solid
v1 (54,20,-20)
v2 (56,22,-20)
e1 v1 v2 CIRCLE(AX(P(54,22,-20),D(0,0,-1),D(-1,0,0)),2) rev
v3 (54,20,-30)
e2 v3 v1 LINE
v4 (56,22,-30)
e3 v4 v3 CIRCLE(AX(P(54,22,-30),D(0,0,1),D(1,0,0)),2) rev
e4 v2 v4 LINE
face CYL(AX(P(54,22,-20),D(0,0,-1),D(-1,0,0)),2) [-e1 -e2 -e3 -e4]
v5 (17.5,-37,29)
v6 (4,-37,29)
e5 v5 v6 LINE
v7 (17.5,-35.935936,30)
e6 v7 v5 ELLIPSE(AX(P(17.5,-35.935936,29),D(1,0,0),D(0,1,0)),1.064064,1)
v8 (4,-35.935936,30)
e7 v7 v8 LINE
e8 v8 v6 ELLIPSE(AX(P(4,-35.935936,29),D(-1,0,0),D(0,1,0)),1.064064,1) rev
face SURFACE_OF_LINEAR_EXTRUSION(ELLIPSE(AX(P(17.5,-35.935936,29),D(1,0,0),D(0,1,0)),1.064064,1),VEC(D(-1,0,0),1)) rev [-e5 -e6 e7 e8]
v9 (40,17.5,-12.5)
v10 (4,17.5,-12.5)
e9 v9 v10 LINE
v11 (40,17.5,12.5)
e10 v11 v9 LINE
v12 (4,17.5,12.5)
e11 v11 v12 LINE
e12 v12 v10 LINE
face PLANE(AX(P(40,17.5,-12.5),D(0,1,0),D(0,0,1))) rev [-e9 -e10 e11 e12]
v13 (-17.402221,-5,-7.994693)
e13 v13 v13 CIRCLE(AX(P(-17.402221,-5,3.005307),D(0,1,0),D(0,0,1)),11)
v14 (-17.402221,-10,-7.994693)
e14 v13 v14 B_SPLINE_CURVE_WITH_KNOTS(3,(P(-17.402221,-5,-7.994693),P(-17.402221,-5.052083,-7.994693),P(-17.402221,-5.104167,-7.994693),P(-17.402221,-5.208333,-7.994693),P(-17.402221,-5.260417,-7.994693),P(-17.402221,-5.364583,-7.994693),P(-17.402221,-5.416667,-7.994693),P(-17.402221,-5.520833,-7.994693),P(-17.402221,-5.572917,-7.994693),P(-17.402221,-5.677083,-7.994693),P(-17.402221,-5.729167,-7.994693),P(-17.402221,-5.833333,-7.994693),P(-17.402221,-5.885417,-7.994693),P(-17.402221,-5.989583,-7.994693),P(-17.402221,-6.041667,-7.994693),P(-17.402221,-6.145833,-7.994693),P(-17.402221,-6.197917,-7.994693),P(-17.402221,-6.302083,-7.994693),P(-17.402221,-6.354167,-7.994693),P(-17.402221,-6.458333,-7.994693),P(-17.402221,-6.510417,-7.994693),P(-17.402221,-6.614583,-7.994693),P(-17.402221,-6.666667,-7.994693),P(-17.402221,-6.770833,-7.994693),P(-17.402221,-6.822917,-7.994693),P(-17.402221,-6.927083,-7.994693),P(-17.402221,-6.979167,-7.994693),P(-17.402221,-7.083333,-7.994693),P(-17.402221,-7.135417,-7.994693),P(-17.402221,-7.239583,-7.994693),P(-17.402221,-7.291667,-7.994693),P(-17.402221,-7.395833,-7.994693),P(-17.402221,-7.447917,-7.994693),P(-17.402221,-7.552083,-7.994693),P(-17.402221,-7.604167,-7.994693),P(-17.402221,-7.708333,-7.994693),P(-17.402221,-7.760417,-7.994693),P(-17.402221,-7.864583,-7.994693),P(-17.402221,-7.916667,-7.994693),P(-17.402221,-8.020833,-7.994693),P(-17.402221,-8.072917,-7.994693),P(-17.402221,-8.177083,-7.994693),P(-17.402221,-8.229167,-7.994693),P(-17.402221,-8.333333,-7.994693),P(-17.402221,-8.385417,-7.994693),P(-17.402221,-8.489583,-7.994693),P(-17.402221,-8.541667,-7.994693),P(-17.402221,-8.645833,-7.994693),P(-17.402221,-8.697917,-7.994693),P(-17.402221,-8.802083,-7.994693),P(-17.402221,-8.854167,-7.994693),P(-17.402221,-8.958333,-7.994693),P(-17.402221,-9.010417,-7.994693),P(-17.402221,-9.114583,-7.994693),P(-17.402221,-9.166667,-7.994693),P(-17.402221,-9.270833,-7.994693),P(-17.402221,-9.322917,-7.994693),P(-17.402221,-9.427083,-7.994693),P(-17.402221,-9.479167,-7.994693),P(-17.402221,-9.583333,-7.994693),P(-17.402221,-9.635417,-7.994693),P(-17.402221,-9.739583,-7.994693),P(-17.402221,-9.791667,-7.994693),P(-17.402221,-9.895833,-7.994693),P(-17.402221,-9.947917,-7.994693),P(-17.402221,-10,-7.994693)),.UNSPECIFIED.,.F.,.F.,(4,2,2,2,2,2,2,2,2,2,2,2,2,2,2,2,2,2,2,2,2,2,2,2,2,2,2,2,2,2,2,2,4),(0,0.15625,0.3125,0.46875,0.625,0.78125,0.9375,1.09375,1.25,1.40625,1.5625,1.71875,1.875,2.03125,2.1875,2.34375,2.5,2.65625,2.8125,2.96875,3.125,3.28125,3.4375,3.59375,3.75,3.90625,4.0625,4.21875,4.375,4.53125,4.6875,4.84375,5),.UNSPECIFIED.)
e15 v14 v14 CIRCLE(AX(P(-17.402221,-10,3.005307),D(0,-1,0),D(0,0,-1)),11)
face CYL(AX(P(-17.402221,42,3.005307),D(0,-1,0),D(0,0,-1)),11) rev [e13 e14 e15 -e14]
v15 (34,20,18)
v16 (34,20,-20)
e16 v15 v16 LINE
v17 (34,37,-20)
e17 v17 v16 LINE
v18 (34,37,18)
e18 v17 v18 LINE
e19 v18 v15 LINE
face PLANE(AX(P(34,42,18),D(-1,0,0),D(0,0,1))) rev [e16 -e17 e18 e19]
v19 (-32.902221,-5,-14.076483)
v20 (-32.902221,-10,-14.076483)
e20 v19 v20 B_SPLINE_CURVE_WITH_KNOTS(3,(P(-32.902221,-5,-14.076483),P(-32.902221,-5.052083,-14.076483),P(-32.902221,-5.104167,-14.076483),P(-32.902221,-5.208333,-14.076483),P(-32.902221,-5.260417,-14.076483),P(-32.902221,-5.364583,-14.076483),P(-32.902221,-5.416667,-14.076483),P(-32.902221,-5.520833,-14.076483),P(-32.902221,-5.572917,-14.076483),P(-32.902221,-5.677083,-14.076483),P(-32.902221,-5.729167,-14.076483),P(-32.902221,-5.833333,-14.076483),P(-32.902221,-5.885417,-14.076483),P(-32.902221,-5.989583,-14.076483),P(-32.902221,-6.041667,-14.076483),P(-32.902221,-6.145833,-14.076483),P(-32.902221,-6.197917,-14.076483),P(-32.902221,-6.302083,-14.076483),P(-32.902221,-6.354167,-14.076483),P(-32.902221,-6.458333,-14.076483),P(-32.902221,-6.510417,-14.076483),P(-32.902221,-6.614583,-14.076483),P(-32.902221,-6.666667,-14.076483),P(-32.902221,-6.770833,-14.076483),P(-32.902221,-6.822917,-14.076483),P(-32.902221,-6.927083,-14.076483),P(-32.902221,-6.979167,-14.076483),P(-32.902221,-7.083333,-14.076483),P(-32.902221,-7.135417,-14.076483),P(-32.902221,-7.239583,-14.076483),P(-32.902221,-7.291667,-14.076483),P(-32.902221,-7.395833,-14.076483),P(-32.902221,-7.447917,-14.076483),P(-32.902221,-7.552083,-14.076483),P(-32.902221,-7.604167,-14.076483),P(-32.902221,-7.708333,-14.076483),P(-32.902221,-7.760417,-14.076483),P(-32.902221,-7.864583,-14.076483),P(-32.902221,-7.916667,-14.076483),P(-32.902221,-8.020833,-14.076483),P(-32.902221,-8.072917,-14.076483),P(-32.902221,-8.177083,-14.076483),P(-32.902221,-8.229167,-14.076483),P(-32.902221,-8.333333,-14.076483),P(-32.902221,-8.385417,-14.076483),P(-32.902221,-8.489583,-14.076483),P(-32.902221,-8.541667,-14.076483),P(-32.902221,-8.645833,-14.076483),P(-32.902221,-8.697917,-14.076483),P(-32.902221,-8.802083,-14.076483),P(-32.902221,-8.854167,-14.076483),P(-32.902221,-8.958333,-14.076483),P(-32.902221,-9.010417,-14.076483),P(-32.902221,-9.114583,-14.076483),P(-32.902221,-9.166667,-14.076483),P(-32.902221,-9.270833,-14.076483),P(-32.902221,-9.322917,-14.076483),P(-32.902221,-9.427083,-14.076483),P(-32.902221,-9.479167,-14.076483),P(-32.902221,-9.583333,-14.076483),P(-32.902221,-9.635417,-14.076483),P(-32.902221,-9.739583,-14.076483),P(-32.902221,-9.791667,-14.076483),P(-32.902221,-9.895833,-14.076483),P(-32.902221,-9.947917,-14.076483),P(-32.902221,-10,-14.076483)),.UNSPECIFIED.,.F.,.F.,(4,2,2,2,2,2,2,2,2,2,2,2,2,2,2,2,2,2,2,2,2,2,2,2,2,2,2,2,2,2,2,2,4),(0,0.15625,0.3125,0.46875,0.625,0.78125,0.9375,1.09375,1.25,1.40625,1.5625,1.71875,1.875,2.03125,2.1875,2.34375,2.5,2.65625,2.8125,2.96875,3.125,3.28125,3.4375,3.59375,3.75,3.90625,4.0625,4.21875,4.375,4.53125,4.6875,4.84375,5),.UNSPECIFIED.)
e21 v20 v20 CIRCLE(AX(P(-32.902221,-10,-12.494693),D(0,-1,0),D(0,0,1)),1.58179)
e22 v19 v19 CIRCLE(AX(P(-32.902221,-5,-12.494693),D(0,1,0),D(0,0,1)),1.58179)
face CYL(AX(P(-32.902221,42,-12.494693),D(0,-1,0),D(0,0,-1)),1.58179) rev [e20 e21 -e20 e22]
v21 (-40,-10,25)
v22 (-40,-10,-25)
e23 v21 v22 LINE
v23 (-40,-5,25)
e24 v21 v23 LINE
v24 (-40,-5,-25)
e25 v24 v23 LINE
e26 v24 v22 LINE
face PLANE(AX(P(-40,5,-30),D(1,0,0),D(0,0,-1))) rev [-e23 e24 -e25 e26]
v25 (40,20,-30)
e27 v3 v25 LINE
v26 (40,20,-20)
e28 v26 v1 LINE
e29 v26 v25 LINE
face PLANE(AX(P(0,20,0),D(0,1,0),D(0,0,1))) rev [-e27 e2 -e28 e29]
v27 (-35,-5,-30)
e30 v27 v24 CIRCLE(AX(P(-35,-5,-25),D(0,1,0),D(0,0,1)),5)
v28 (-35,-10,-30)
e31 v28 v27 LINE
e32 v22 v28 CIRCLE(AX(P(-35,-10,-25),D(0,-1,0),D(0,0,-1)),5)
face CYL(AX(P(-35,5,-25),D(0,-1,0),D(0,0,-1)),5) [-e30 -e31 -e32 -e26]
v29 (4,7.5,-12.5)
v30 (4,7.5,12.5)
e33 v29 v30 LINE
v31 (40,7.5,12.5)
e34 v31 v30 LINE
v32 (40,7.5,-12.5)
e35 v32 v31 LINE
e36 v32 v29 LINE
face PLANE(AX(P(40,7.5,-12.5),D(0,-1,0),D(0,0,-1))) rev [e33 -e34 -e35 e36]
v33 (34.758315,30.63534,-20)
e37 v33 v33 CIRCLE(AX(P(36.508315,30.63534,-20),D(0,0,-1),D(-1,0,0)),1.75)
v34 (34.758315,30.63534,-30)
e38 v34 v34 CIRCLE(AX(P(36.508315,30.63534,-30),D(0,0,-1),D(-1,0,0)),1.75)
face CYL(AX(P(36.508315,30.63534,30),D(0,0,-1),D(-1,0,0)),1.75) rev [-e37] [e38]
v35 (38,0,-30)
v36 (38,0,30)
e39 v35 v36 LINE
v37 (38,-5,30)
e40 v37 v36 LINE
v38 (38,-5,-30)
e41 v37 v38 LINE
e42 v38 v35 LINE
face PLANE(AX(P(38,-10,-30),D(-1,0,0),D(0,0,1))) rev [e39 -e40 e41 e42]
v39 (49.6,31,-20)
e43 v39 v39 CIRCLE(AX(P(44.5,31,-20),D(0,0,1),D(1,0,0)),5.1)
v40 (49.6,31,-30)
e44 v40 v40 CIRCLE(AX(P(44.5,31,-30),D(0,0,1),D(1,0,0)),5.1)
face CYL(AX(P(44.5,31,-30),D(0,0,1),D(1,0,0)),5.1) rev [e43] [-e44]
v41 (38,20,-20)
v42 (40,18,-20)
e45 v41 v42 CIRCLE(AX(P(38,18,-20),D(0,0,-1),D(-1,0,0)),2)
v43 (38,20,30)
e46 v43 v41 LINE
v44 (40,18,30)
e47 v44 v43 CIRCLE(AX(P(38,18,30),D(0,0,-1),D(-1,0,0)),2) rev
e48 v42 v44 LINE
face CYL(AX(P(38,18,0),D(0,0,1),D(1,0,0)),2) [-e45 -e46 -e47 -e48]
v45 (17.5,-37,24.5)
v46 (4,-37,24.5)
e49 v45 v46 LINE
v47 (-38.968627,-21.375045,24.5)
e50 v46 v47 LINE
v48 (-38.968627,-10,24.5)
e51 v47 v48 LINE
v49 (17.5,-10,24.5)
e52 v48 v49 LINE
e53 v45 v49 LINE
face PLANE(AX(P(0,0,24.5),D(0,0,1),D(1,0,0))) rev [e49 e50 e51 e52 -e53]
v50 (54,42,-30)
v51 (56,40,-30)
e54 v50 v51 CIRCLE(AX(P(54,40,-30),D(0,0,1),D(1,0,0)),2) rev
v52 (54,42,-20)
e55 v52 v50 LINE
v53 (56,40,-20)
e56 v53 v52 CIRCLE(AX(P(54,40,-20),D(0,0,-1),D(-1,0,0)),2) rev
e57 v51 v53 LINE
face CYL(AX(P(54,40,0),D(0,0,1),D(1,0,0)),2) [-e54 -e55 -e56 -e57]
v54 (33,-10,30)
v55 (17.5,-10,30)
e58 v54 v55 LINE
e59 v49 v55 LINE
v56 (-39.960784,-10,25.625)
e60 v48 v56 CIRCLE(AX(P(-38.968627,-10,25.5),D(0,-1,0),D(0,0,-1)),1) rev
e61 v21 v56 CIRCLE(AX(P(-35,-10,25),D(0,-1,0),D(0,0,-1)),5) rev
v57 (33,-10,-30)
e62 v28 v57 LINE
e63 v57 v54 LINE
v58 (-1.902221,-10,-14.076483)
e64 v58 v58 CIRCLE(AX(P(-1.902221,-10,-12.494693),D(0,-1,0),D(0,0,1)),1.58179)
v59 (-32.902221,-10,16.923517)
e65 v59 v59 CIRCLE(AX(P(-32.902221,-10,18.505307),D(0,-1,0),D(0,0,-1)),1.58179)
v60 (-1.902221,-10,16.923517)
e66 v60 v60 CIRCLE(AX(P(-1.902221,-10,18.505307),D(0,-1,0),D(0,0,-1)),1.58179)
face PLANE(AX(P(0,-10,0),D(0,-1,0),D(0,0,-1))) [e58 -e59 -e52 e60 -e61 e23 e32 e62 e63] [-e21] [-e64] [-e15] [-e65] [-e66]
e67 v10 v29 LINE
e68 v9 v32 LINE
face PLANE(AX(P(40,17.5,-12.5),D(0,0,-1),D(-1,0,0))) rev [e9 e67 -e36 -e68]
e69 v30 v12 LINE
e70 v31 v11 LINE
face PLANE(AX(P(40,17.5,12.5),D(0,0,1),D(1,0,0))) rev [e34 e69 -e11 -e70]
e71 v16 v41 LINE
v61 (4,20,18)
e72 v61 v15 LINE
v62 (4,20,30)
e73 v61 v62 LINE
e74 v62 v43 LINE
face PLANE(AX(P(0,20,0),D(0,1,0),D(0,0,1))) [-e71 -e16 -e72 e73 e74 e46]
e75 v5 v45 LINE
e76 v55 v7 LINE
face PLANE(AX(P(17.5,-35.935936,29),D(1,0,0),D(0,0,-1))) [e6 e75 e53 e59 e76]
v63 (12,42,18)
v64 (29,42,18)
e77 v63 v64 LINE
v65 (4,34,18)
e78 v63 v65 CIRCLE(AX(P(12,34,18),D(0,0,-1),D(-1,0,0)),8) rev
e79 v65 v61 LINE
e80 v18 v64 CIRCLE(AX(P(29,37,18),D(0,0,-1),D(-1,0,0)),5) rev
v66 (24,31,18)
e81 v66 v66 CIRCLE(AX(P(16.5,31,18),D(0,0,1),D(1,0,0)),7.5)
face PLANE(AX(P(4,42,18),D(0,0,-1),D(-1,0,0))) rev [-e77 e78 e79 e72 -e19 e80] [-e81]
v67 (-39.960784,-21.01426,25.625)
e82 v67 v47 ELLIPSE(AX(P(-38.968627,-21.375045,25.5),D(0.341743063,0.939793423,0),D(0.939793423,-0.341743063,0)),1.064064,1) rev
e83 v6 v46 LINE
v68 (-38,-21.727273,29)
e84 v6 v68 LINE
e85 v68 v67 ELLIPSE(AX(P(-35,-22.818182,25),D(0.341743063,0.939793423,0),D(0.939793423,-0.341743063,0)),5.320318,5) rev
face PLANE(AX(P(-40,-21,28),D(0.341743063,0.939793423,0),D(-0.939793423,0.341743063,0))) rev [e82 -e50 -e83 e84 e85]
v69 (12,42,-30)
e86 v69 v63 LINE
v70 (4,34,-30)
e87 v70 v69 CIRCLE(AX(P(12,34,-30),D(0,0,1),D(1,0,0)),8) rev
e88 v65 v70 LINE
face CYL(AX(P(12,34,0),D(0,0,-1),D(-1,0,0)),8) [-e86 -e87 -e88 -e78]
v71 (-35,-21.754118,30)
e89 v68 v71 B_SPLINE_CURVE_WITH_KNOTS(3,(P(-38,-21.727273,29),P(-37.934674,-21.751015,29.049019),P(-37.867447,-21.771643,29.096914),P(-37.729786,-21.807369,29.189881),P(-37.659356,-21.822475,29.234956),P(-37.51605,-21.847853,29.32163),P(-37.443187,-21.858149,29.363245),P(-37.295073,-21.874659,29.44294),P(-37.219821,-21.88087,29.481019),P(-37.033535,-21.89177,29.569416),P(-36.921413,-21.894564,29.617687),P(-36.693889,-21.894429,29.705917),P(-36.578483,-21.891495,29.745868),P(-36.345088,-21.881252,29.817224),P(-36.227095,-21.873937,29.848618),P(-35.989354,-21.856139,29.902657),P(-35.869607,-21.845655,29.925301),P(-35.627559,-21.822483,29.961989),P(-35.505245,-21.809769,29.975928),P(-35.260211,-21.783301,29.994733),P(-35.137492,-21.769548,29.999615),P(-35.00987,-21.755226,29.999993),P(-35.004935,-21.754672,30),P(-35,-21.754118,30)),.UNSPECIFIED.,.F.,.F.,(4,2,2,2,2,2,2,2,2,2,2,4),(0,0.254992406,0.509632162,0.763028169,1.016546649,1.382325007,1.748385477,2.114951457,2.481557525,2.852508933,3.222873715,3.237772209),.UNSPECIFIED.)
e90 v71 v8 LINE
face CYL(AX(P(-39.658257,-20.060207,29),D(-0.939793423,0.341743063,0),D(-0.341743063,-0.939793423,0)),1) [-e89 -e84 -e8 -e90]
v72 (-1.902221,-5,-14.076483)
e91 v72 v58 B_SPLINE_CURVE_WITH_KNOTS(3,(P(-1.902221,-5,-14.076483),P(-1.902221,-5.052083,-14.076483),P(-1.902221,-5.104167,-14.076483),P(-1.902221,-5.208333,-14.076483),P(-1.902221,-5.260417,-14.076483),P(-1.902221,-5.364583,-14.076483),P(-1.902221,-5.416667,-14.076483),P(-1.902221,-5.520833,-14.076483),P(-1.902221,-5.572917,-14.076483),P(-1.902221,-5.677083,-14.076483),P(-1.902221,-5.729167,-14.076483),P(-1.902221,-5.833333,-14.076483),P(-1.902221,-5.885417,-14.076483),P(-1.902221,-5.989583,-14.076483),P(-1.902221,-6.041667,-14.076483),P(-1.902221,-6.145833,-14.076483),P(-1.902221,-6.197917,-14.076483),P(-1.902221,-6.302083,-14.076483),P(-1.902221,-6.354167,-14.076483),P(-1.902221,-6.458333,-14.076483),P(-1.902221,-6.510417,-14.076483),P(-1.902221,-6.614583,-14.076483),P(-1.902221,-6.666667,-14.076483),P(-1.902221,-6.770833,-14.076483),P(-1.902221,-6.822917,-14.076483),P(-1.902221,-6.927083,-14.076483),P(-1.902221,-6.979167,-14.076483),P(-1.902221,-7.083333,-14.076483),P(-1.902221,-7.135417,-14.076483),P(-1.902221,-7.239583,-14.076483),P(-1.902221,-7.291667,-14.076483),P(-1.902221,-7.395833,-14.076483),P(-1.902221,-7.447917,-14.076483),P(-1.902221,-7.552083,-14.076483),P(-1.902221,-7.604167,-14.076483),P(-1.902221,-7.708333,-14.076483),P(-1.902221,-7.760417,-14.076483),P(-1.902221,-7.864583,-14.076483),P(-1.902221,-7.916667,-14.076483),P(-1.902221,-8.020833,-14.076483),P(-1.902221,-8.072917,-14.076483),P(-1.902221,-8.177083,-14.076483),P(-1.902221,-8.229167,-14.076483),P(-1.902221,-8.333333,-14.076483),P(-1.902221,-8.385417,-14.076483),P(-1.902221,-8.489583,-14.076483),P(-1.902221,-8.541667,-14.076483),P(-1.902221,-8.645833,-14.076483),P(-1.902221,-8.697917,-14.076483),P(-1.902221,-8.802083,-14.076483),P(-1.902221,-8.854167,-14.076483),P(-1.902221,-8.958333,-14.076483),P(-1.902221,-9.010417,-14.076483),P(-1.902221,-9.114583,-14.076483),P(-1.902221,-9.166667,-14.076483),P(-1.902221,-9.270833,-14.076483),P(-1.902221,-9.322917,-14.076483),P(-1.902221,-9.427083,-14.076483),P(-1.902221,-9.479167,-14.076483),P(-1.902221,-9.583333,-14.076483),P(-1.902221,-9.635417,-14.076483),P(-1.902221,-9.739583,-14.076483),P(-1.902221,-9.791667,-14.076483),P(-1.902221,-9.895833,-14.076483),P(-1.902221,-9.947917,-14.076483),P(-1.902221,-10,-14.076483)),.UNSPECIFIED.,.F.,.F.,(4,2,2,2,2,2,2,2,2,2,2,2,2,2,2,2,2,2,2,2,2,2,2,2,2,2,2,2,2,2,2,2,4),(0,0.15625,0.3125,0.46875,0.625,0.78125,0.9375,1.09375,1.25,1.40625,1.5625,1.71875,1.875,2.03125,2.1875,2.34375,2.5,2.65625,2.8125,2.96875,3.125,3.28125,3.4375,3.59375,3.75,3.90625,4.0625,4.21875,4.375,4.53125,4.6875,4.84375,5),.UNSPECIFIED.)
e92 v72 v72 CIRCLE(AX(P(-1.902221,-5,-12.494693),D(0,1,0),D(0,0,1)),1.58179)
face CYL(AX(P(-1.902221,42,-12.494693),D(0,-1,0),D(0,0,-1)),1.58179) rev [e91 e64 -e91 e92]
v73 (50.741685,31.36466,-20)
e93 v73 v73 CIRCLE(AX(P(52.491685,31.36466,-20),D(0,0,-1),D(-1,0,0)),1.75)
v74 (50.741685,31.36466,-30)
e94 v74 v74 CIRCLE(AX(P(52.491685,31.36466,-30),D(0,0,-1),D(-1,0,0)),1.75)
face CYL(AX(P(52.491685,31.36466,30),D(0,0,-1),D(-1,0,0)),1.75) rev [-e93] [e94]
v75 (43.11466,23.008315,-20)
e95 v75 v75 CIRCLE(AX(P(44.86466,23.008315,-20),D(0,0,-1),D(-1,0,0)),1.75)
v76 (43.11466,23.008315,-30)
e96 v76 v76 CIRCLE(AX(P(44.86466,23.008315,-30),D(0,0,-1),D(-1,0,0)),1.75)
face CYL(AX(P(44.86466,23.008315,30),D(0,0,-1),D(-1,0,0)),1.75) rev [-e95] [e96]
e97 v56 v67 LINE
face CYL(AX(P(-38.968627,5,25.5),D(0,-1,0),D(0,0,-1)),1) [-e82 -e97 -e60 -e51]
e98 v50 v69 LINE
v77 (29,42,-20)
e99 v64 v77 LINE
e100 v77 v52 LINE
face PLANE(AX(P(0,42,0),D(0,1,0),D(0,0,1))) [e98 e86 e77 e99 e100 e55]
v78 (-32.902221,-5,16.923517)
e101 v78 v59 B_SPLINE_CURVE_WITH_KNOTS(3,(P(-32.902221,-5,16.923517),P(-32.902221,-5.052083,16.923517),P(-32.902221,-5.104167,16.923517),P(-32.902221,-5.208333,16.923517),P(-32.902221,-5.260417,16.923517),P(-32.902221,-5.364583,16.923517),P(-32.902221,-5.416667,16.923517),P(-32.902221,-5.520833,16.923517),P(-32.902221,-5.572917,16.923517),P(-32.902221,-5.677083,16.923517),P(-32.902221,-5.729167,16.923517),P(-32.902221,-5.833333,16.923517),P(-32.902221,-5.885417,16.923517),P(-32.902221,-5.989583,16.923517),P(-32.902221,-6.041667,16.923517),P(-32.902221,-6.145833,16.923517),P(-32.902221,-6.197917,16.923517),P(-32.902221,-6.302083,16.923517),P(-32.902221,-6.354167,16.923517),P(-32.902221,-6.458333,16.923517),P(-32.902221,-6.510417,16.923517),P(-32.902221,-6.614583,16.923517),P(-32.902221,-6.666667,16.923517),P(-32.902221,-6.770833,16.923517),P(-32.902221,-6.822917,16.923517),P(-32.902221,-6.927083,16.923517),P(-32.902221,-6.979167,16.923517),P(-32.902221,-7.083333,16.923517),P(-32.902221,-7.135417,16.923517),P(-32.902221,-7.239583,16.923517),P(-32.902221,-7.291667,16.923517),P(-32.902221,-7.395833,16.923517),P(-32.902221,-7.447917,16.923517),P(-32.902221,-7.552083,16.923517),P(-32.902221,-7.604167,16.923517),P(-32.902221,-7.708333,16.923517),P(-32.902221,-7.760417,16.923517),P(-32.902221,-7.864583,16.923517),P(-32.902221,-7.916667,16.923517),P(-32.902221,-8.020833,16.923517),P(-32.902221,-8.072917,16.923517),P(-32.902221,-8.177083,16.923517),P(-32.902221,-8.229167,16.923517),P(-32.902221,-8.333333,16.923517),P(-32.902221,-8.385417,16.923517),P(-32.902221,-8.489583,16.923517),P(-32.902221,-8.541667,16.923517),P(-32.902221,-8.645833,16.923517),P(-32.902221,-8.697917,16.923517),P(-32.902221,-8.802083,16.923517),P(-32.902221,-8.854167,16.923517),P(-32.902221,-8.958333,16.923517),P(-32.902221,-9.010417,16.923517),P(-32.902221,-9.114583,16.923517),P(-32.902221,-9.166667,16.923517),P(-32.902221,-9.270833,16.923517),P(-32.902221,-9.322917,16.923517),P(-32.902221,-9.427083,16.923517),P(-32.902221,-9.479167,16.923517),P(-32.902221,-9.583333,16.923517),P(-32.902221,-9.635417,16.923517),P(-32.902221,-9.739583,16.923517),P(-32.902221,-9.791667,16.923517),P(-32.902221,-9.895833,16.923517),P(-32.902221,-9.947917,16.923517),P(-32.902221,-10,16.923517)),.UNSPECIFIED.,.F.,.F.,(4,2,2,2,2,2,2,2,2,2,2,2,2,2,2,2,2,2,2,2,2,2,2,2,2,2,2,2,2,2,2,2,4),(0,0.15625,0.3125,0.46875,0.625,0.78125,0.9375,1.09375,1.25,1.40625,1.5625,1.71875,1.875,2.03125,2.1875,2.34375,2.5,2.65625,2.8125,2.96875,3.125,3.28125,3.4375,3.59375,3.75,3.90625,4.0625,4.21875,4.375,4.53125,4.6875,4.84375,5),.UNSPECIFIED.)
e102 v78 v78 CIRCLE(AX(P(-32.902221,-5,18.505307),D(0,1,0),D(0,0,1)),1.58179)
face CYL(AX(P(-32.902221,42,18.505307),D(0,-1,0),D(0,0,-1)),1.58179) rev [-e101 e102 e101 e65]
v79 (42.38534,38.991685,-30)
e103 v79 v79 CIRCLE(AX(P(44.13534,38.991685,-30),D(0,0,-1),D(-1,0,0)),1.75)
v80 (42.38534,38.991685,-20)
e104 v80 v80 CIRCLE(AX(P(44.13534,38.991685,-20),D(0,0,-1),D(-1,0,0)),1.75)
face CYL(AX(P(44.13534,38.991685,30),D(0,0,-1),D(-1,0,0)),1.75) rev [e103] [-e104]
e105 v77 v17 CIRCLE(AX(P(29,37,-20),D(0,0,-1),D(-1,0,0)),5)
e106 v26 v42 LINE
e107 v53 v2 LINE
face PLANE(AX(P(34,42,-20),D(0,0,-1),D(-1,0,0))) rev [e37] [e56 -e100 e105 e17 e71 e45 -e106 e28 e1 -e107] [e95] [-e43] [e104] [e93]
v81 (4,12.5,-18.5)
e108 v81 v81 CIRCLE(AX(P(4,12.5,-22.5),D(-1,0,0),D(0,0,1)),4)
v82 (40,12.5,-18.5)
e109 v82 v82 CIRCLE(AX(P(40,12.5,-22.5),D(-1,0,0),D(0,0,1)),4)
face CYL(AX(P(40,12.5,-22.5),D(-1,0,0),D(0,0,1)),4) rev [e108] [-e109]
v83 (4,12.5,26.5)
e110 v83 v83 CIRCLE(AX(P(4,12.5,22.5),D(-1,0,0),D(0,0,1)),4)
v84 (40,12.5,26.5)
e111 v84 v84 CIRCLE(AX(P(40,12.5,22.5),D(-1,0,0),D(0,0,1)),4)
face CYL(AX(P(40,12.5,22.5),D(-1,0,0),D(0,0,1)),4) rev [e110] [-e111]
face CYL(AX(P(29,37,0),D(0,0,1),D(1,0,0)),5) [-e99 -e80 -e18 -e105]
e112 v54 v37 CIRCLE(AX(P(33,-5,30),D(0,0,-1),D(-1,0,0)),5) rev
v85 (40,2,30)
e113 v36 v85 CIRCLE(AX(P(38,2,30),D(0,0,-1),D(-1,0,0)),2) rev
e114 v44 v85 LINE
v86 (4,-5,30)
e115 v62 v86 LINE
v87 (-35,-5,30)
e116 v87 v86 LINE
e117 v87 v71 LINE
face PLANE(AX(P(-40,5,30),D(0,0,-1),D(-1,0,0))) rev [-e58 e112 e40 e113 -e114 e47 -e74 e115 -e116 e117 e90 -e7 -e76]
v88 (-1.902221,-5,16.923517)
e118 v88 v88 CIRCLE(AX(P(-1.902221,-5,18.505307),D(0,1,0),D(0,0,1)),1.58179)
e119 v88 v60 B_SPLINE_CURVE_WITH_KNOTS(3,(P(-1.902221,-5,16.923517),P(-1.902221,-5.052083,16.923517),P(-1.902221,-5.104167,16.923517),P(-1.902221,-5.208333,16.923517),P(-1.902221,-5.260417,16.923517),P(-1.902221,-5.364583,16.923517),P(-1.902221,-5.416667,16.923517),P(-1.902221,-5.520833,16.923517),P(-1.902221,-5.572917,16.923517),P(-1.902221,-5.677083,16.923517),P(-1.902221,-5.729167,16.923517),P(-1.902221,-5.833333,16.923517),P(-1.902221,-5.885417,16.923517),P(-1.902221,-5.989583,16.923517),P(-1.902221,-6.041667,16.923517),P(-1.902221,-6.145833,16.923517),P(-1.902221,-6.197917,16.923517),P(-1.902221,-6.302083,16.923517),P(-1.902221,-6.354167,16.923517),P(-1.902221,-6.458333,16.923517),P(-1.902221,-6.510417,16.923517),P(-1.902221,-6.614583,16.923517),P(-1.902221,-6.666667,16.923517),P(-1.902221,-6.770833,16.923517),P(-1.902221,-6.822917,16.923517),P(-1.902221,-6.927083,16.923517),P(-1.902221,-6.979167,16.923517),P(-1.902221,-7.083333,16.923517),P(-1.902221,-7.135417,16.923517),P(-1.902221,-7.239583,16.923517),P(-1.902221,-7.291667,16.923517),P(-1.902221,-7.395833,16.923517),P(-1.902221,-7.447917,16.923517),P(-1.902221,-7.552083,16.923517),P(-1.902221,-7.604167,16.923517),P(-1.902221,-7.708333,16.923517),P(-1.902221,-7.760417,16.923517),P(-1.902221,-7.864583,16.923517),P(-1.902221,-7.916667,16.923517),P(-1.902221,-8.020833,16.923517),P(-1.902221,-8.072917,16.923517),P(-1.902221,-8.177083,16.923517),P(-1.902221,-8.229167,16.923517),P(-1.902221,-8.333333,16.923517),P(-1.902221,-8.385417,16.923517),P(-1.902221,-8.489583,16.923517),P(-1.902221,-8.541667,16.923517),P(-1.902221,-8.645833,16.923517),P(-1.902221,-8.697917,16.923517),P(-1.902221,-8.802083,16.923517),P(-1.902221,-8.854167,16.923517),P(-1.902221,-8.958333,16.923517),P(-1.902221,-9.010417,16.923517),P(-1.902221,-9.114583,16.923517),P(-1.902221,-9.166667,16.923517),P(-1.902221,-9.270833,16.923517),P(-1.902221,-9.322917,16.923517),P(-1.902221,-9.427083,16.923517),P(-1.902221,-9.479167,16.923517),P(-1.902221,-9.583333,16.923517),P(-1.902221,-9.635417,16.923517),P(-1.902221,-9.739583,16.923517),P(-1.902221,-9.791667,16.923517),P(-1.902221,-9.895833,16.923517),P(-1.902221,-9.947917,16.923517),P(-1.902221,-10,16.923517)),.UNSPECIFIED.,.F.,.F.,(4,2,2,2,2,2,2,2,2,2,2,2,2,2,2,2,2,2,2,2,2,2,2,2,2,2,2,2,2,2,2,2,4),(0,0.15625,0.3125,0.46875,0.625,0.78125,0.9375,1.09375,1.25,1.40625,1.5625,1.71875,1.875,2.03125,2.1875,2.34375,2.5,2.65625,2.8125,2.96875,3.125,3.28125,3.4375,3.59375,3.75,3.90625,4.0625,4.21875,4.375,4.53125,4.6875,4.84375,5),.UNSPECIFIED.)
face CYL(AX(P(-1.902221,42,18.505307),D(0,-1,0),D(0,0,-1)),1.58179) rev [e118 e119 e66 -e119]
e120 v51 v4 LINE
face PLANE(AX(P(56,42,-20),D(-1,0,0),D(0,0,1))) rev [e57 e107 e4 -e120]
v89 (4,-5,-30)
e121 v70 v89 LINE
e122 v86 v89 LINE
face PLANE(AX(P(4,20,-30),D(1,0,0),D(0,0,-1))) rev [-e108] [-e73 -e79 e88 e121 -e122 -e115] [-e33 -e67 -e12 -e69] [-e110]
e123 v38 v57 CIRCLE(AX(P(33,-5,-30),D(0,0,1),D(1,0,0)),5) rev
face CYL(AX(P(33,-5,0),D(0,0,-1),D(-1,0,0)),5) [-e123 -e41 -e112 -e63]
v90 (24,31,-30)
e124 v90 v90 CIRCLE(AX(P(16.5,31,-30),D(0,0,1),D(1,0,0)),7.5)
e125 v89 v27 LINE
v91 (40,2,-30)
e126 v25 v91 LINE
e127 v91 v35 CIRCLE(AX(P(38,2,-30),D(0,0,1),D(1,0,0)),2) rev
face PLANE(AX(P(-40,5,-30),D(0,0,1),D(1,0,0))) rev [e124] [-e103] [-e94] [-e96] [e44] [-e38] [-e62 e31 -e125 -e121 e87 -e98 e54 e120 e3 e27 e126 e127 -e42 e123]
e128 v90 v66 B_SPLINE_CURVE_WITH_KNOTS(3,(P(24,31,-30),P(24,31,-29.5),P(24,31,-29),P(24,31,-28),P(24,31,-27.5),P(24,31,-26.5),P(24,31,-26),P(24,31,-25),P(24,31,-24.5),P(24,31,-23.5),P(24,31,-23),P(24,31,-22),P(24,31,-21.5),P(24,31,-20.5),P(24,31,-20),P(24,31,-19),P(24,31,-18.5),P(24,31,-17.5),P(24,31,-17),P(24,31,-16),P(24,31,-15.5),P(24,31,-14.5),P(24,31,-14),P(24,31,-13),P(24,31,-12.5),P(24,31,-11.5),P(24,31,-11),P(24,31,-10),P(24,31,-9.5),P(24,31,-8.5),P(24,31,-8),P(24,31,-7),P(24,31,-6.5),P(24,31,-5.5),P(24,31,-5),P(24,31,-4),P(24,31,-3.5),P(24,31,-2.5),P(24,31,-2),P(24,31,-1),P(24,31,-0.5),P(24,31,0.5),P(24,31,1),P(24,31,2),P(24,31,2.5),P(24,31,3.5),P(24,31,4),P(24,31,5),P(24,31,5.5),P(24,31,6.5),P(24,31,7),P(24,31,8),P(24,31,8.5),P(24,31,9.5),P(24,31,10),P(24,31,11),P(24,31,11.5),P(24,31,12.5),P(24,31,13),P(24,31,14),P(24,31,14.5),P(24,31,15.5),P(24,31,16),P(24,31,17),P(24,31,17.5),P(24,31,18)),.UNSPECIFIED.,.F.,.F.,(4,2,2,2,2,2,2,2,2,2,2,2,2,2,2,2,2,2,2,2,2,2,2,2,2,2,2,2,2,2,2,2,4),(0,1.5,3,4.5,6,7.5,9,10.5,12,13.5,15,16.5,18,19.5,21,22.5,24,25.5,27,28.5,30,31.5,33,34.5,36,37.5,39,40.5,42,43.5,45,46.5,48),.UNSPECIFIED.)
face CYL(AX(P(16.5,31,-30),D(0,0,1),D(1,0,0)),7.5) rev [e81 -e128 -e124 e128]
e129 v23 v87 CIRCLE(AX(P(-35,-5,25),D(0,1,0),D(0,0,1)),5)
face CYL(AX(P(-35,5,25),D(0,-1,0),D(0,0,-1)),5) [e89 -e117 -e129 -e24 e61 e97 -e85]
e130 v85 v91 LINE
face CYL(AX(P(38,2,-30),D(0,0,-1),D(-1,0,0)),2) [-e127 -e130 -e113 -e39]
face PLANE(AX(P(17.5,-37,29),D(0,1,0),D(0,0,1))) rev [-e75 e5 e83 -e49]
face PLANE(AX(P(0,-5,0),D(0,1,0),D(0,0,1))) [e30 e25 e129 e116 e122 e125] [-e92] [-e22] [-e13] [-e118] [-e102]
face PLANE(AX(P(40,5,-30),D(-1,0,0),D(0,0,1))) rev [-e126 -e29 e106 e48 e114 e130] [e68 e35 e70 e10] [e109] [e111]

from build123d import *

# Parameters (mm, degrees)
SKETCH_1_W           = 80
SKETCH_1_H           = 60
EXTRUDE_1_DEPTH      = 5
SKETCH_2_R           = 1.75
SKETCH_2_R_2         = 11
CUT_EXTRUDE_1_DEPTH  = 51.249378106
SKETCH_3_W           = 36
SKETCH_3_H           = 60
EXTRUDE_2_DEPTH      = 15
SKETCH_4_R           = 4
SKETCH_4_W           = 25
SKETCH_4_H           = 10
CUT_EXTRUDE_7_DEPTH  = 57.885850613
EXTRUDE_6_DEPTH      = 22
SKETCH_15_R          = 7.5
CUT_EXTRUDE_8_DEPTH  = 85.876380696
SKETCH_16_R          = 5.1
CUT_EXTRUDE_9_DEPTH  = 87.02325267
FILLET_1_R           = 8
FILLET_2_R           = 5
FILLET_3_R           = 2
FILLET_4_R           = 2
SKETCH_20_R          = 1.75
CUT_EXTRUDE_11_DEPTH = 93.195444573
SKETCH_23_W          = 78
SKETCH_23_H          = 60
EXTRUDE_8_DEPTH      = 10
SKETCH_26_W          = 44
SKETCH_26_H          = 60
CUT_EXTRUDE_13_DEPTH = 10
EXTRUDE_9_DEPTH      = 5
FILLET_5_R           = 5
SKETCH_25_R          = 1.581789818
SKETCH_25_R_2        = 11
CUT_EXTRUDE_14_DEPTH = 83.097503007
CUT_EXTRUDE_15_DEPTH = 1.5
EXTRUDE_10_DEPTH     = 2
FILLET_6_R           = 1
CUT_EXTRUDE_16_DEPTH = 83.097503007
EXTRUDE_11_DEPTH     = 13.5


with BuildPart() as part:
    # 草图1 → 凸台-拉伸1 (new body)
    with BuildSketch(Plane(origin=(0, 0, 0), x_dir=(1, 0, 0), z_dir=(0, 1, 0))):
        Rectangle(SKETCH_1_W, SKETCH_1_H)
    extrude(amount=EXTRUDE_1_DEPTH)

    # 草图2 → 切除-拉伸1 (cut, through all)
    with BuildSketch(Plane(origin=(0, 5, 0), x_dir=(1, 0, 0), z_dir=(0, 1, 0))):
        with Locations(Location((-3, 15.5, 0), (0, 0, 270))):
            Circle(SKETCH_2_R)
        with Locations(Location((-3, -15.5, 0), (0, 0, 270))):
            Circle(SKETCH_2_R)
        with Locations(Location((-34, -15.5, 0), (0, 0, 270))):
            Circle(SKETCH_2_R)
        with Locations(Location((-34, 15.5, 0), (0, 0, 270))):
            Circle(SKETCH_2_R)
        with Locations(Location((-18.5, 0, 0), (0, 0, 270))):
            Circle(SKETCH_2_R_2)
    extrude(amount=-CUT_EXTRUDE_1_DEPTH, mode=Mode.SUBTRACT)

    # 草图3 → 凸台-拉伸2 (add)
    with BuildSketch(Plane(origin=(0, 5, 0), x_dir=(1, 0, 0), z_dir=(0, 1, 0))):
        with Locations((22, 0)):
            Rectangle(SKETCH_3_W, SKETCH_3_H)
    extrude(amount=EXTRUDE_2_DEPTH)

    # 草图4 → 切除-拉伸7 (cut, through all)
    with BuildSketch(Plane.ZY.offset(-4)):
        with Locations((-22.5, 12.5)):
            Circle(SKETCH_4_R)
        with Locations((22.5, 12.5)):
            Circle(SKETCH_4_R)
        with Locations((0, 12.5)):
            Rectangle(SKETCH_4_W, SKETCH_4_H)
    extrude(amount=-CUT_EXTRUDE_7_DEPTH, mode=Mode.SUBTRACT)

    # 草图14 → 凸台-拉伸6 (add)
    with BuildSketch(Plane(origin=(0, 20, 0), x_dir=(1, 0, 0), z_dir=(0, 1, 0))):
        Polygon((4, 30), (4, -18), (34, -18), (34, 20), (56, 20), (56, 30), align=None)
    extrude(amount=EXTRUDE_6_DEPTH)

    # 草图15 → 切除-拉伸8 (cut, through all)
    with BuildSketch(Plane.XY.offset(18)):
        with Locations((16.5, 31)):
            Circle(SKETCH_15_R)
    extrude(amount=-CUT_EXTRUDE_8_DEPTH, mode=Mode.SUBTRACT)

    # 草图16 → 切除-拉伸9 (cut, through all)
    with BuildSketch(Plane.XY.offset(-20)):
        with Locations((44.5, 31)):
            Circle(SKETCH_16_R)
    extrude(amount=-CUT_EXTRUDE_9_DEPTH, mode=Mode.SUBTRACT)

    # 圆角1
    fillet_1_edges = [part.edges().sort_by_distance(p)[0] for p in [
        (4, 42, -6),
    ]]
    fillet(fillet_1_edges, radius=FILLET_1_R)

    # 圆角2
    fillet_2_edges = [part.edges().sort_by_distance(p)[0] for p in [
        (34, 42, -1),
    ]]
    fillet(fillet_2_edges, radius=FILLET_2_R)

    # 圆角3
    fillet_3_edges = [part.edges().sort_by_distance(p)[0] for p in [
        (56, 42, -25),
    ]]
    fillet(fillet_3_edges, radius=FILLET_3_R)

    # 圆角4
    fillet_4_edges = [part.edges().sort_by_distance(p)[0] for p in [
        (40, 20, 5),
        (40, 0, 0),
        (56, 20, -25),
    ]]
    fillet(fillet_4_edges, radius=FILLET_4_R)

    # 草图20 → 切除-拉伸11 (cut, through all)
    with BuildSketch(Plane(origin=(0, 0, -30), x_dir=(-1, 0, 0), z_dir=(0, 0, -1))):
        with Locations((-44.135340411, 38.99168464)):
            Circle(SKETCH_20_R)
        with Locations((-36.50831536, 30.635340412)):
            Circle(SKETCH_20_R)
        with Locations((-44.864659589, 23.00831536)):
            Circle(SKETCH_20_R)
        with Locations((-52.49168464, 31.364659589)):
            Circle(SKETCH_20_R)
    extrude(amount=-CUT_EXTRUDE_11_DEPTH, mode=Mode.SUBTRACT)

    # 草图23 → 凸台-拉伸8 (add)
    with BuildSketch(Plane.XZ):
        with Locations((-1, 0)):
            Rectangle(SKETCH_23_W, SKETCH_23_H)
    extrude(amount=EXTRUDE_8_DEPTH)

    # 草图26 → 切除-拉伸13 (cut)
    with BuildSketch(Plane(origin=(0, 5, 0), x_dir=(1, 0, 0), z_dir=(0, 1, 0))):
        with Locations((-18, 0)):
            Rectangle(SKETCH_26_W, SKETCH_26_H)
    extrude(amount=-CUT_EXTRUDE_13_DEPTH, mode=Mode.SUBTRACT)

    # 草图29 → 凸台-拉伸9 (add)
    with BuildSketch(Plane.XY.offset(23)):
        Polygon((-40, -5), (-40, -21), (4, -37), (4, -5), align=None)
    extrude(amount=EXTRUDE_9_DEPTH)

    # 圆角5
    fillet_5_edges = [part.edges().sort_by_distance(p)[0] for p in [
        (38, -10, 0),
        (-40, -7.5, 30),
        (-40, -7.5, -30),
    ]]
    fillet(fillet_5_edges, radius=FILLET_5_R)

    # 草图25 → 切除-拉伸14 (cut, through all)
    with BuildSketch(Plane.XZ.offset(10)):
        with Locations(Location((-32.902220535, -12.494692857, 0), (0, 0, 270))):
            Circle(SKETCH_25_R)
        with Locations(Location((-1.902220535, 18.505307143, 0), (0, 0, 270))):
            Circle(SKETCH_25_R)
        with Locations(Location((-32.902220535, 18.505307143, 0), (0, 0, 270))):
            Circle(SKETCH_25_R)
        with Locations(Location((-1.902220535, -12.494692857, 0), (0, 0, 270))):
            Circle(SKETCH_25_R)
        with Locations(Location((-17.402220535, 3.005307143, 0), (0, 0, 270))):
            Circle(SKETCH_25_R_2)
    extrude(amount=-CUT_EXTRUDE_14_DEPTH, mode=Mode.SUBTRACT)

    # 草图30 → 切除-拉伸15 (cut)
    with BuildSketch(Plane(origin=(0, 0, 23), x_dir=(-1, 0, 0), z_dir=(0, 0, -1))):
        Polygon((-4, -10), (40, -10), (40, -21), (-4, -37), align=None)
    extrude(amount=-CUT_EXTRUDE_15_DEPTH, mode=Mode.SUBTRACT)

    # 草图31 → 凸台-拉伸10 (add)
    with BuildSketch(Plane.XY.offset(28)):
        Polygon((-39.701600618, -21.108508866), (-39.701600618, -10), (4, -10), (4, -37), align=None)
    extrude(amount=EXTRUDE_10_DEPTH)

    # 圆角6
    # the kernel refuses this fillet: 1 mm, written as the material it takes off along each edge
    with BuildSketch(Plane(origin=(-40, -10, 24.5), x_dir=(1, 0, 0), z_dir=(0, -1, 0))) as fillet_6_piece_1:
        with BuildLine():
            CenterArc((1.031373033, 1), FILLET_6_R, 172.819244219, 97.180755781)
            Line((0.039216292, 1.125), (-0.059999382, 1.1375))
            ThreePointArc((-0.059999382, 1.1375), (-0.1, 0.5), (-0.1, 0))
            Line((-0.1, 0), (0, -0.1))
            Line((0, -0.1), (1.031373033, -0.1))
            Line((1.031373033, -0.1), (1.031373033, 0))
        make_face()
    extrude(amount=13.814208278, mode=Mode.SUBTRACT)
    with BuildSketch(Plane(origin=(6.349483559, -37.854357658, 30), x_dir=(0.34174306308670427, 0.9397934234884371, 0), z_dir=(-0.9397934234884371, 0.3417430630867043, 0))) as fillet_6_piece_2:
        with BuildLine():
            CenterArc((FILLET_6_R, FILLET_6_R), FILLET_6_R, 180, 90)
            Line((0, FILLET_6_R), (-FILLET_6_R * 0.02, FILLET_6_R))
            Line((-FILLET_6_R * 0.02, FILLET_6_R), (-FILLET_6_R * 0.02, -FILLET_6_R * 0.02))
            Line((-FILLET_6_R * 0.02, -FILLET_6_R * 0.02), (FILLET_6_R, -FILLET_6_R * 0.02))
            Line((FILLET_6_R, -FILLET_6_R * 0.02), (FILLET_6_R, 0))
        make_face()
    extrude(amount=51.501283714, mode=Mode.SUBTRACT)
    with BuildSketch(Plane(origin=(-39.701600618, -23.49461161, 28), x_dir=(1, 0, 0), z_dir=(0, 1, 0))) as fillet_6_piece_3_section:
        with BuildLine():
            CenterArc((1, -0.954441098), FILLET_6_R, 107.361491651, 72.638508349)
            Line((0, -0.954441098), (-0.02, -0.954441098))
            Line((-0.02, -0.954441098), (-0.02, 0))
            Line((-0.02, 0), (0, 0.02))
            ThreePointArc((0, 0.02), (0.350800309, 0.02), (0.69563263, 0.019088822))
            Line((0.69563263, 0.019088822), (0.701600618, 0))
        make_face()
    fillet_6_piece_3 = extrude(amount=15.880714354, mode=Mode.PRIVATE)
    fillet_6_piece_3 = fillet_6_piece_3 - Plane(origin=(-35, -15.554254433, 25), x_dir=(0, 0, 1), z_dir=(0, -1, 0)) * Cylinder(5, 36, mode=Mode.PRIVATE)
    add(fillet_6_piece_3, mode=Mode.SUBTRACT)
    with BuildSketch(Plane(origin=(-39.701600618, -23.608508866, 30), x_dir=(1, 0, 0), z_dir=(0, 1, 0))) as fillet_6_piece_4:
        with BuildLine():
            CenterArc((FILLET_6_R, FILLET_6_R), FILLET_6_R, 180, 90)
            Line((0, FILLET_6_R), (-FILLET_6_R * 0.02, FILLET_6_R))
            Line((-FILLET_6_R * 0.02, FILLET_6_R), (-FILLET_6_R * 0.02, -FILLET_6_R * 0.02))
            Line((-FILLET_6_R * 0.02, -FILLET_6_R * 0.02), (FILLET_6_R, -FILLET_6_R * 0.02))
            Line((FILLET_6_R, -FILLET_6_R * 0.02), (FILLET_6_R, 0))
        make_face()
    extrude(amount=16.108508866, mode=Mode.SUBTRACT)

    # 草图32 → 切除-拉伸16 (cut, through all)
    with BuildSketch(Plane(origin=(0, -10, 0), x_dir=(1, 0, 0), z_dir=(0, 1, 0))):
        with BuildLine():
            Line((-39.701600618, -28.954441098), (-39.701600618, -29))
            ThreePointArc((-39.701600618, -29), (-39.408707399, -29.707106781), (-38.701600618, -30))
            Line((-38.701600618, -30), (-35, -30))
            ThreePointArc((-35, -30), (-37.236067977, -29.472135955), (-39, -28))
            ThreePointArc((-39, -28), (-39.507329909, -28.362157121), (-39.701600618, -28.954441098))
        make_face()
    extrude(amount=-CUT_EXTRUDE_16_DEPTH, mode=Mode.SUBTRACT)

    # 草图33 → 凸台-拉伸11 (add)
    with BuildSketch(Plane(origin=(4, 0, 0), x_dir=(0, 0, -1), z_dir=(1, 0, 0))):
        with BuildLine():
            Line((-30, -10), (-30, -35.935936372))
            add(Edge.make_bspline(
                [(-30, -35.935936372), (-30, -37), (-29, -37)],
                knots=[1.570796327, 1.570796327, 1.570796327, 3.141592654, 3.141592654, 3.141592654], degree=2, weights=[1, 0.707106781, 1]))
            Line((-29, -37), (-24.5, -37))
            Line((-24.5, -37), (-24.5, -10))
            Line((-24.5, -10), (-30, -10))
        make_face()
    extrude(amount=EXTRUDE_11_DEPTH)


solid = part.part
